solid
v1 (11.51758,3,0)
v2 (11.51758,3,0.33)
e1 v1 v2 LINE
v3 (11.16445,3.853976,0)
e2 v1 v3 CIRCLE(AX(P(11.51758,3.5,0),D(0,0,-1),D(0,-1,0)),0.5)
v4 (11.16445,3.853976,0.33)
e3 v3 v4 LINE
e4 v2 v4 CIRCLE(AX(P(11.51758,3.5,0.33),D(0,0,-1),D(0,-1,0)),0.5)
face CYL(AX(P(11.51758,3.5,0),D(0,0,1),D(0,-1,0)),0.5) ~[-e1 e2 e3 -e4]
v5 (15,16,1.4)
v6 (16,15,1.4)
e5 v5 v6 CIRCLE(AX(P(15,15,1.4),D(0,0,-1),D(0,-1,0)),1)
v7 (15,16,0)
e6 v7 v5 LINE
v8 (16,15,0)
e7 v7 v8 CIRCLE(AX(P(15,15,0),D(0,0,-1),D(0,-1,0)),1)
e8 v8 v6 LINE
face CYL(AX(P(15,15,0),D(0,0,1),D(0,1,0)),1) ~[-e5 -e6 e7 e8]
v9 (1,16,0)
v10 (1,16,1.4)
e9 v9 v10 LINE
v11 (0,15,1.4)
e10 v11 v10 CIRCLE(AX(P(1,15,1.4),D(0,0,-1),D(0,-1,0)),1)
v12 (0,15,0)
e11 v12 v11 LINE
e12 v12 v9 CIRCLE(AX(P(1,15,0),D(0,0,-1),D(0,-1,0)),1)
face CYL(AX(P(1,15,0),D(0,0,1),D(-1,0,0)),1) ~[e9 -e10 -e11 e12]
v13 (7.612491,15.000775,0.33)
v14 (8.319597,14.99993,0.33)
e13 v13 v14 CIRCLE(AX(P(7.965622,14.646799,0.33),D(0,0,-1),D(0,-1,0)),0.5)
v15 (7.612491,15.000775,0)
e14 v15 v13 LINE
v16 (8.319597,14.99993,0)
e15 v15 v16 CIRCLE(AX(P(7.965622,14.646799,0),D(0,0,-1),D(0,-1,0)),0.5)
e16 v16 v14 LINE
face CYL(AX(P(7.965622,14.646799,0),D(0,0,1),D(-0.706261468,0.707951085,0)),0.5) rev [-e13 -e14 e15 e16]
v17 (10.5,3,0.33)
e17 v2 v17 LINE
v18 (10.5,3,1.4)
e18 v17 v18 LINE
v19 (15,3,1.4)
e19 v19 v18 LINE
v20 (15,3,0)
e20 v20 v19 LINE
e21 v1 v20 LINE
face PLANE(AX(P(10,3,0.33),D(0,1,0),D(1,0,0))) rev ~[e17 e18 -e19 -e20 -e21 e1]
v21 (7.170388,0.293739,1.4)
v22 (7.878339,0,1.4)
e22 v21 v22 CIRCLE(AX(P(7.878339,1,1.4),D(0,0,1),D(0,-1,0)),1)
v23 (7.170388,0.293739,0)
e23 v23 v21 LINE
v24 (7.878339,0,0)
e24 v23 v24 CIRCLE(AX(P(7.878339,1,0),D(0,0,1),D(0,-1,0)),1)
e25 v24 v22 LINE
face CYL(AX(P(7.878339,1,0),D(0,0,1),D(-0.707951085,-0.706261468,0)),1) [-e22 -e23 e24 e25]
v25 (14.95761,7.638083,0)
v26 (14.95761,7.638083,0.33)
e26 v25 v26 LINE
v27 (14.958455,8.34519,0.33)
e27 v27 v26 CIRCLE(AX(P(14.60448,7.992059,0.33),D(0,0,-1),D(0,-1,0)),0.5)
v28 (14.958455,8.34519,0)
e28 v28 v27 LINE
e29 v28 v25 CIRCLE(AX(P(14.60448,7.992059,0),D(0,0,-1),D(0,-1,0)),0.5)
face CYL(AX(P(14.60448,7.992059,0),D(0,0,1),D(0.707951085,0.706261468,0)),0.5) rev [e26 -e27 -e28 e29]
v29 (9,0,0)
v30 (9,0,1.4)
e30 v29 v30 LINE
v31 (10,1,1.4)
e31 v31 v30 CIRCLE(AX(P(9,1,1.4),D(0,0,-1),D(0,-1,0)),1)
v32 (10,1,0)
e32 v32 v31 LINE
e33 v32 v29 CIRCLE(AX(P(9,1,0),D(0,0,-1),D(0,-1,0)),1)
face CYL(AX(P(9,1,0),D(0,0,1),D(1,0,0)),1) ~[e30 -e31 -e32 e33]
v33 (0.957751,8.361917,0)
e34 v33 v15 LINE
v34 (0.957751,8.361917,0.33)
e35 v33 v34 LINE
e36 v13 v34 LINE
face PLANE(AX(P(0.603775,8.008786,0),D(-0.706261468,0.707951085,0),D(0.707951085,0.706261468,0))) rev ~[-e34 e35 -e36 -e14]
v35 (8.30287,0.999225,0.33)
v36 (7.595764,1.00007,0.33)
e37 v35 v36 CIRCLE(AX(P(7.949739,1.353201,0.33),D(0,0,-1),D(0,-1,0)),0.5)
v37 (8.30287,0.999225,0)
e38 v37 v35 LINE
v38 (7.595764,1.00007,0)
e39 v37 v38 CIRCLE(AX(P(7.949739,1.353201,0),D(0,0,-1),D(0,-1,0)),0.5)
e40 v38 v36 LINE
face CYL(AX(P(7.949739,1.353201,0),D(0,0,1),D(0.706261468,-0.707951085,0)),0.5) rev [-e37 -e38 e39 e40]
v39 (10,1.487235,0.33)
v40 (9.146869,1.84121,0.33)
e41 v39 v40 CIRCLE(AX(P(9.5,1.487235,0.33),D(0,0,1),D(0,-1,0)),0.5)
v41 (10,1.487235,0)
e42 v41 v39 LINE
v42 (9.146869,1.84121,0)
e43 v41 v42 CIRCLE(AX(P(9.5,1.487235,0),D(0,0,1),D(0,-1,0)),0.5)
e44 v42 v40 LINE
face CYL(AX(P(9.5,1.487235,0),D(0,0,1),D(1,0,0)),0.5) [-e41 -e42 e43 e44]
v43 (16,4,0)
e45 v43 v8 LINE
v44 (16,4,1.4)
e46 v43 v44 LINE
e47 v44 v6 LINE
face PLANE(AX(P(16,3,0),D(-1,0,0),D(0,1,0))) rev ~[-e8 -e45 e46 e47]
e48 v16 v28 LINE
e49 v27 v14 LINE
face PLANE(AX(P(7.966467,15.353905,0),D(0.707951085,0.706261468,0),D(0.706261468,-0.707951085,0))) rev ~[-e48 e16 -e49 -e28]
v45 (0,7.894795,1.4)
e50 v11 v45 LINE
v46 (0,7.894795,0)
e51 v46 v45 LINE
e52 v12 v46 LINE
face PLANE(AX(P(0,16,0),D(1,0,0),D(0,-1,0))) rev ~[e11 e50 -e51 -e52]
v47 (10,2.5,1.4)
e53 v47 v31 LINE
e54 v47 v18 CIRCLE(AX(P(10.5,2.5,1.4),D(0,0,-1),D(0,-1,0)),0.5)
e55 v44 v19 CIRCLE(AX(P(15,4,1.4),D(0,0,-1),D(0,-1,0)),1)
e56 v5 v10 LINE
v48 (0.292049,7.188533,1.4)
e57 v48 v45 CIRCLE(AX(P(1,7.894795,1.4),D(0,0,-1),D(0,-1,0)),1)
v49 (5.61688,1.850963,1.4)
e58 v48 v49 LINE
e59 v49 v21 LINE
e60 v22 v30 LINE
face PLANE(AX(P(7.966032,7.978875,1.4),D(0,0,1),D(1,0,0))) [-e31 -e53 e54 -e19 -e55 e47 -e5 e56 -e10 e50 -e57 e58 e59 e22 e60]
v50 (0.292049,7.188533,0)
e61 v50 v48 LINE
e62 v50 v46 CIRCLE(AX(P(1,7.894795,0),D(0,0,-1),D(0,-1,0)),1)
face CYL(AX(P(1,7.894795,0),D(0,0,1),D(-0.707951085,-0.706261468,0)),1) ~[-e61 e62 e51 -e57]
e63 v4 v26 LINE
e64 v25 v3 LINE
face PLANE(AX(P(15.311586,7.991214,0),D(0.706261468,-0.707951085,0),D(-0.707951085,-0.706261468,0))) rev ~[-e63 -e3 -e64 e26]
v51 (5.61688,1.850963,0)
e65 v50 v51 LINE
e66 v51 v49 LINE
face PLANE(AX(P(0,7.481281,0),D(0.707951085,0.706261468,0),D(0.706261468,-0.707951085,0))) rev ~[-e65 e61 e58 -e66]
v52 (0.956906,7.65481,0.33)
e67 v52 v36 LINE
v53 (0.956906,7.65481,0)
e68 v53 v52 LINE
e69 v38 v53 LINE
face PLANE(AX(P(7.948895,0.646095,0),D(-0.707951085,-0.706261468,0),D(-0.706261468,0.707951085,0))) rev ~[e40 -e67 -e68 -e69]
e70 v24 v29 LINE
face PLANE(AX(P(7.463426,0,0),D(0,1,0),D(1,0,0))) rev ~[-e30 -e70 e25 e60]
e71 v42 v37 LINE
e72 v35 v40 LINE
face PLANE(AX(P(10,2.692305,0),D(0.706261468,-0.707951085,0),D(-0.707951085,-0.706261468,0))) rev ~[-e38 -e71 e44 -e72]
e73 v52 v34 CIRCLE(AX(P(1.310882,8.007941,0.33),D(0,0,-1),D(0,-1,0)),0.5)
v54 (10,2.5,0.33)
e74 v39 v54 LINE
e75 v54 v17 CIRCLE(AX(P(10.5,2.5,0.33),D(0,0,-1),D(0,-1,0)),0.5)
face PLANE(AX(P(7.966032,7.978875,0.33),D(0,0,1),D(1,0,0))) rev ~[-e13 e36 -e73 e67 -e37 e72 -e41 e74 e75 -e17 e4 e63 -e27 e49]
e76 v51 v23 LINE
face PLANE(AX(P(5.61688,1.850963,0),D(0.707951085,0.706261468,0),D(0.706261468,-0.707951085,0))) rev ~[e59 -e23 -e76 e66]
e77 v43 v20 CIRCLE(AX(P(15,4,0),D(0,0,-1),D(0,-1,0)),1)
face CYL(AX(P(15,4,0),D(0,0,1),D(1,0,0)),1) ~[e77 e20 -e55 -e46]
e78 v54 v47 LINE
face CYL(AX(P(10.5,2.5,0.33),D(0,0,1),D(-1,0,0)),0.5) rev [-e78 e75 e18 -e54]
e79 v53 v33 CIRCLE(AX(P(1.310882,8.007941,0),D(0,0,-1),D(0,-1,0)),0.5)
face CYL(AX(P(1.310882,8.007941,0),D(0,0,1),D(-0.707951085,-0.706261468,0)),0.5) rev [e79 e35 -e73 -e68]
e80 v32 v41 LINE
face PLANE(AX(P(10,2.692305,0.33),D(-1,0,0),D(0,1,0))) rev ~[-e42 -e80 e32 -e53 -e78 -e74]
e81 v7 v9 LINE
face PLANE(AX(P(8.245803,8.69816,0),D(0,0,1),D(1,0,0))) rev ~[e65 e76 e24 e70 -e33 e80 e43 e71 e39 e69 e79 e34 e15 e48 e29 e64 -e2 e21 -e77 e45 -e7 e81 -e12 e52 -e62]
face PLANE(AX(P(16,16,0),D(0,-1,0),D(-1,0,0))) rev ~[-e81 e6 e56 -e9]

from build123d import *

# Parameters (mm, degrees)
F1_DEPTH = 1.4
F2_START = 0.33
F2_DEPTH = 1.07
F3_R     = 1
F4_F1_R  = 0.5
F4_F2_R  = 0.5


# Not quite as in the source:
# - two fillets or chamfers of one size are made in one step
# - a feature names something its author has since deleted; it is built from what else it names


with BuildPart() as f1:
    # F0 (on Top) → F1 (new body)
    with BuildSketch(Plane.XY):
        Polygon((5.6168799675, 1.8509632612), (7.4634256667, 0), (10, 0), (10, 2.6923049909), (7.9488945061, 0.6460947242), (0.6037752352, 8.0087860049), (7.9664665159, 15.3539052758), (15.3115857869, 7.9912139951), (10.3084311196, 3), (16, 3), (16, 16), (0, 16), (0, 7.4812807055), (2.1561987725, 5.3199235762), align=None)
    extrude(amount=F1_DEPTH)

    # F0 (on Top) → F2 (join)
    with BuildSketch(Plane.XY.offset(F2_START)):
        Polygon((7.9488945061, 0.6460947242), (10, 2.6923049909), (10, 3), (10.3084311196, 3), (15.3115857869, 7.9912139951), (7.9664665159, 15.3539052758), (0.6037752352, 8.0087860049), align=None)
    extrude(amount=F2_DEPTH)

    # F3
    f3_edges = [f1.edges().sort_by_distance(p)[0] for p in [
        (16, 16, 0.7),
        (0, 16, 0.7),
        (10, 0, 0.7),
        (16, 3, 0.7),
        (0, 7.481281, 0.7),
        (7.463426, 0, 0.7),
    ]]
    fillet(f3_edges, radius=F3_R)

    # F4: fillet of radius 0.5 on 7 edges, made by hand

    # F4_f1
    f4_f1_edges = [f1.edges().sort_by_distance(p)[0] for p in [
        (10.3084311196, 3, 0.165),
        (10, 2.6923049909, 0.165),
    ]]
    fillet(f4_f1_edges, radius=F4_F1_R)

    # F4_f2
    f4_f2_edges = [f1.edges().sort_by_distance(p)[0] for p in [
        (7.9664665159, 15.3539052758, 0.165),
        (0.6037752352, 8.0087860049, 0.165),
        (7.9488945061, 0.6460947242, 0.165),
        (15.3115857869, 7.9912139951, 0.165),
        (10, 3, 0.865),
    ]]
    fillet(f4_f2_edges, radius=F4_F2_R)


solid = f1.part
